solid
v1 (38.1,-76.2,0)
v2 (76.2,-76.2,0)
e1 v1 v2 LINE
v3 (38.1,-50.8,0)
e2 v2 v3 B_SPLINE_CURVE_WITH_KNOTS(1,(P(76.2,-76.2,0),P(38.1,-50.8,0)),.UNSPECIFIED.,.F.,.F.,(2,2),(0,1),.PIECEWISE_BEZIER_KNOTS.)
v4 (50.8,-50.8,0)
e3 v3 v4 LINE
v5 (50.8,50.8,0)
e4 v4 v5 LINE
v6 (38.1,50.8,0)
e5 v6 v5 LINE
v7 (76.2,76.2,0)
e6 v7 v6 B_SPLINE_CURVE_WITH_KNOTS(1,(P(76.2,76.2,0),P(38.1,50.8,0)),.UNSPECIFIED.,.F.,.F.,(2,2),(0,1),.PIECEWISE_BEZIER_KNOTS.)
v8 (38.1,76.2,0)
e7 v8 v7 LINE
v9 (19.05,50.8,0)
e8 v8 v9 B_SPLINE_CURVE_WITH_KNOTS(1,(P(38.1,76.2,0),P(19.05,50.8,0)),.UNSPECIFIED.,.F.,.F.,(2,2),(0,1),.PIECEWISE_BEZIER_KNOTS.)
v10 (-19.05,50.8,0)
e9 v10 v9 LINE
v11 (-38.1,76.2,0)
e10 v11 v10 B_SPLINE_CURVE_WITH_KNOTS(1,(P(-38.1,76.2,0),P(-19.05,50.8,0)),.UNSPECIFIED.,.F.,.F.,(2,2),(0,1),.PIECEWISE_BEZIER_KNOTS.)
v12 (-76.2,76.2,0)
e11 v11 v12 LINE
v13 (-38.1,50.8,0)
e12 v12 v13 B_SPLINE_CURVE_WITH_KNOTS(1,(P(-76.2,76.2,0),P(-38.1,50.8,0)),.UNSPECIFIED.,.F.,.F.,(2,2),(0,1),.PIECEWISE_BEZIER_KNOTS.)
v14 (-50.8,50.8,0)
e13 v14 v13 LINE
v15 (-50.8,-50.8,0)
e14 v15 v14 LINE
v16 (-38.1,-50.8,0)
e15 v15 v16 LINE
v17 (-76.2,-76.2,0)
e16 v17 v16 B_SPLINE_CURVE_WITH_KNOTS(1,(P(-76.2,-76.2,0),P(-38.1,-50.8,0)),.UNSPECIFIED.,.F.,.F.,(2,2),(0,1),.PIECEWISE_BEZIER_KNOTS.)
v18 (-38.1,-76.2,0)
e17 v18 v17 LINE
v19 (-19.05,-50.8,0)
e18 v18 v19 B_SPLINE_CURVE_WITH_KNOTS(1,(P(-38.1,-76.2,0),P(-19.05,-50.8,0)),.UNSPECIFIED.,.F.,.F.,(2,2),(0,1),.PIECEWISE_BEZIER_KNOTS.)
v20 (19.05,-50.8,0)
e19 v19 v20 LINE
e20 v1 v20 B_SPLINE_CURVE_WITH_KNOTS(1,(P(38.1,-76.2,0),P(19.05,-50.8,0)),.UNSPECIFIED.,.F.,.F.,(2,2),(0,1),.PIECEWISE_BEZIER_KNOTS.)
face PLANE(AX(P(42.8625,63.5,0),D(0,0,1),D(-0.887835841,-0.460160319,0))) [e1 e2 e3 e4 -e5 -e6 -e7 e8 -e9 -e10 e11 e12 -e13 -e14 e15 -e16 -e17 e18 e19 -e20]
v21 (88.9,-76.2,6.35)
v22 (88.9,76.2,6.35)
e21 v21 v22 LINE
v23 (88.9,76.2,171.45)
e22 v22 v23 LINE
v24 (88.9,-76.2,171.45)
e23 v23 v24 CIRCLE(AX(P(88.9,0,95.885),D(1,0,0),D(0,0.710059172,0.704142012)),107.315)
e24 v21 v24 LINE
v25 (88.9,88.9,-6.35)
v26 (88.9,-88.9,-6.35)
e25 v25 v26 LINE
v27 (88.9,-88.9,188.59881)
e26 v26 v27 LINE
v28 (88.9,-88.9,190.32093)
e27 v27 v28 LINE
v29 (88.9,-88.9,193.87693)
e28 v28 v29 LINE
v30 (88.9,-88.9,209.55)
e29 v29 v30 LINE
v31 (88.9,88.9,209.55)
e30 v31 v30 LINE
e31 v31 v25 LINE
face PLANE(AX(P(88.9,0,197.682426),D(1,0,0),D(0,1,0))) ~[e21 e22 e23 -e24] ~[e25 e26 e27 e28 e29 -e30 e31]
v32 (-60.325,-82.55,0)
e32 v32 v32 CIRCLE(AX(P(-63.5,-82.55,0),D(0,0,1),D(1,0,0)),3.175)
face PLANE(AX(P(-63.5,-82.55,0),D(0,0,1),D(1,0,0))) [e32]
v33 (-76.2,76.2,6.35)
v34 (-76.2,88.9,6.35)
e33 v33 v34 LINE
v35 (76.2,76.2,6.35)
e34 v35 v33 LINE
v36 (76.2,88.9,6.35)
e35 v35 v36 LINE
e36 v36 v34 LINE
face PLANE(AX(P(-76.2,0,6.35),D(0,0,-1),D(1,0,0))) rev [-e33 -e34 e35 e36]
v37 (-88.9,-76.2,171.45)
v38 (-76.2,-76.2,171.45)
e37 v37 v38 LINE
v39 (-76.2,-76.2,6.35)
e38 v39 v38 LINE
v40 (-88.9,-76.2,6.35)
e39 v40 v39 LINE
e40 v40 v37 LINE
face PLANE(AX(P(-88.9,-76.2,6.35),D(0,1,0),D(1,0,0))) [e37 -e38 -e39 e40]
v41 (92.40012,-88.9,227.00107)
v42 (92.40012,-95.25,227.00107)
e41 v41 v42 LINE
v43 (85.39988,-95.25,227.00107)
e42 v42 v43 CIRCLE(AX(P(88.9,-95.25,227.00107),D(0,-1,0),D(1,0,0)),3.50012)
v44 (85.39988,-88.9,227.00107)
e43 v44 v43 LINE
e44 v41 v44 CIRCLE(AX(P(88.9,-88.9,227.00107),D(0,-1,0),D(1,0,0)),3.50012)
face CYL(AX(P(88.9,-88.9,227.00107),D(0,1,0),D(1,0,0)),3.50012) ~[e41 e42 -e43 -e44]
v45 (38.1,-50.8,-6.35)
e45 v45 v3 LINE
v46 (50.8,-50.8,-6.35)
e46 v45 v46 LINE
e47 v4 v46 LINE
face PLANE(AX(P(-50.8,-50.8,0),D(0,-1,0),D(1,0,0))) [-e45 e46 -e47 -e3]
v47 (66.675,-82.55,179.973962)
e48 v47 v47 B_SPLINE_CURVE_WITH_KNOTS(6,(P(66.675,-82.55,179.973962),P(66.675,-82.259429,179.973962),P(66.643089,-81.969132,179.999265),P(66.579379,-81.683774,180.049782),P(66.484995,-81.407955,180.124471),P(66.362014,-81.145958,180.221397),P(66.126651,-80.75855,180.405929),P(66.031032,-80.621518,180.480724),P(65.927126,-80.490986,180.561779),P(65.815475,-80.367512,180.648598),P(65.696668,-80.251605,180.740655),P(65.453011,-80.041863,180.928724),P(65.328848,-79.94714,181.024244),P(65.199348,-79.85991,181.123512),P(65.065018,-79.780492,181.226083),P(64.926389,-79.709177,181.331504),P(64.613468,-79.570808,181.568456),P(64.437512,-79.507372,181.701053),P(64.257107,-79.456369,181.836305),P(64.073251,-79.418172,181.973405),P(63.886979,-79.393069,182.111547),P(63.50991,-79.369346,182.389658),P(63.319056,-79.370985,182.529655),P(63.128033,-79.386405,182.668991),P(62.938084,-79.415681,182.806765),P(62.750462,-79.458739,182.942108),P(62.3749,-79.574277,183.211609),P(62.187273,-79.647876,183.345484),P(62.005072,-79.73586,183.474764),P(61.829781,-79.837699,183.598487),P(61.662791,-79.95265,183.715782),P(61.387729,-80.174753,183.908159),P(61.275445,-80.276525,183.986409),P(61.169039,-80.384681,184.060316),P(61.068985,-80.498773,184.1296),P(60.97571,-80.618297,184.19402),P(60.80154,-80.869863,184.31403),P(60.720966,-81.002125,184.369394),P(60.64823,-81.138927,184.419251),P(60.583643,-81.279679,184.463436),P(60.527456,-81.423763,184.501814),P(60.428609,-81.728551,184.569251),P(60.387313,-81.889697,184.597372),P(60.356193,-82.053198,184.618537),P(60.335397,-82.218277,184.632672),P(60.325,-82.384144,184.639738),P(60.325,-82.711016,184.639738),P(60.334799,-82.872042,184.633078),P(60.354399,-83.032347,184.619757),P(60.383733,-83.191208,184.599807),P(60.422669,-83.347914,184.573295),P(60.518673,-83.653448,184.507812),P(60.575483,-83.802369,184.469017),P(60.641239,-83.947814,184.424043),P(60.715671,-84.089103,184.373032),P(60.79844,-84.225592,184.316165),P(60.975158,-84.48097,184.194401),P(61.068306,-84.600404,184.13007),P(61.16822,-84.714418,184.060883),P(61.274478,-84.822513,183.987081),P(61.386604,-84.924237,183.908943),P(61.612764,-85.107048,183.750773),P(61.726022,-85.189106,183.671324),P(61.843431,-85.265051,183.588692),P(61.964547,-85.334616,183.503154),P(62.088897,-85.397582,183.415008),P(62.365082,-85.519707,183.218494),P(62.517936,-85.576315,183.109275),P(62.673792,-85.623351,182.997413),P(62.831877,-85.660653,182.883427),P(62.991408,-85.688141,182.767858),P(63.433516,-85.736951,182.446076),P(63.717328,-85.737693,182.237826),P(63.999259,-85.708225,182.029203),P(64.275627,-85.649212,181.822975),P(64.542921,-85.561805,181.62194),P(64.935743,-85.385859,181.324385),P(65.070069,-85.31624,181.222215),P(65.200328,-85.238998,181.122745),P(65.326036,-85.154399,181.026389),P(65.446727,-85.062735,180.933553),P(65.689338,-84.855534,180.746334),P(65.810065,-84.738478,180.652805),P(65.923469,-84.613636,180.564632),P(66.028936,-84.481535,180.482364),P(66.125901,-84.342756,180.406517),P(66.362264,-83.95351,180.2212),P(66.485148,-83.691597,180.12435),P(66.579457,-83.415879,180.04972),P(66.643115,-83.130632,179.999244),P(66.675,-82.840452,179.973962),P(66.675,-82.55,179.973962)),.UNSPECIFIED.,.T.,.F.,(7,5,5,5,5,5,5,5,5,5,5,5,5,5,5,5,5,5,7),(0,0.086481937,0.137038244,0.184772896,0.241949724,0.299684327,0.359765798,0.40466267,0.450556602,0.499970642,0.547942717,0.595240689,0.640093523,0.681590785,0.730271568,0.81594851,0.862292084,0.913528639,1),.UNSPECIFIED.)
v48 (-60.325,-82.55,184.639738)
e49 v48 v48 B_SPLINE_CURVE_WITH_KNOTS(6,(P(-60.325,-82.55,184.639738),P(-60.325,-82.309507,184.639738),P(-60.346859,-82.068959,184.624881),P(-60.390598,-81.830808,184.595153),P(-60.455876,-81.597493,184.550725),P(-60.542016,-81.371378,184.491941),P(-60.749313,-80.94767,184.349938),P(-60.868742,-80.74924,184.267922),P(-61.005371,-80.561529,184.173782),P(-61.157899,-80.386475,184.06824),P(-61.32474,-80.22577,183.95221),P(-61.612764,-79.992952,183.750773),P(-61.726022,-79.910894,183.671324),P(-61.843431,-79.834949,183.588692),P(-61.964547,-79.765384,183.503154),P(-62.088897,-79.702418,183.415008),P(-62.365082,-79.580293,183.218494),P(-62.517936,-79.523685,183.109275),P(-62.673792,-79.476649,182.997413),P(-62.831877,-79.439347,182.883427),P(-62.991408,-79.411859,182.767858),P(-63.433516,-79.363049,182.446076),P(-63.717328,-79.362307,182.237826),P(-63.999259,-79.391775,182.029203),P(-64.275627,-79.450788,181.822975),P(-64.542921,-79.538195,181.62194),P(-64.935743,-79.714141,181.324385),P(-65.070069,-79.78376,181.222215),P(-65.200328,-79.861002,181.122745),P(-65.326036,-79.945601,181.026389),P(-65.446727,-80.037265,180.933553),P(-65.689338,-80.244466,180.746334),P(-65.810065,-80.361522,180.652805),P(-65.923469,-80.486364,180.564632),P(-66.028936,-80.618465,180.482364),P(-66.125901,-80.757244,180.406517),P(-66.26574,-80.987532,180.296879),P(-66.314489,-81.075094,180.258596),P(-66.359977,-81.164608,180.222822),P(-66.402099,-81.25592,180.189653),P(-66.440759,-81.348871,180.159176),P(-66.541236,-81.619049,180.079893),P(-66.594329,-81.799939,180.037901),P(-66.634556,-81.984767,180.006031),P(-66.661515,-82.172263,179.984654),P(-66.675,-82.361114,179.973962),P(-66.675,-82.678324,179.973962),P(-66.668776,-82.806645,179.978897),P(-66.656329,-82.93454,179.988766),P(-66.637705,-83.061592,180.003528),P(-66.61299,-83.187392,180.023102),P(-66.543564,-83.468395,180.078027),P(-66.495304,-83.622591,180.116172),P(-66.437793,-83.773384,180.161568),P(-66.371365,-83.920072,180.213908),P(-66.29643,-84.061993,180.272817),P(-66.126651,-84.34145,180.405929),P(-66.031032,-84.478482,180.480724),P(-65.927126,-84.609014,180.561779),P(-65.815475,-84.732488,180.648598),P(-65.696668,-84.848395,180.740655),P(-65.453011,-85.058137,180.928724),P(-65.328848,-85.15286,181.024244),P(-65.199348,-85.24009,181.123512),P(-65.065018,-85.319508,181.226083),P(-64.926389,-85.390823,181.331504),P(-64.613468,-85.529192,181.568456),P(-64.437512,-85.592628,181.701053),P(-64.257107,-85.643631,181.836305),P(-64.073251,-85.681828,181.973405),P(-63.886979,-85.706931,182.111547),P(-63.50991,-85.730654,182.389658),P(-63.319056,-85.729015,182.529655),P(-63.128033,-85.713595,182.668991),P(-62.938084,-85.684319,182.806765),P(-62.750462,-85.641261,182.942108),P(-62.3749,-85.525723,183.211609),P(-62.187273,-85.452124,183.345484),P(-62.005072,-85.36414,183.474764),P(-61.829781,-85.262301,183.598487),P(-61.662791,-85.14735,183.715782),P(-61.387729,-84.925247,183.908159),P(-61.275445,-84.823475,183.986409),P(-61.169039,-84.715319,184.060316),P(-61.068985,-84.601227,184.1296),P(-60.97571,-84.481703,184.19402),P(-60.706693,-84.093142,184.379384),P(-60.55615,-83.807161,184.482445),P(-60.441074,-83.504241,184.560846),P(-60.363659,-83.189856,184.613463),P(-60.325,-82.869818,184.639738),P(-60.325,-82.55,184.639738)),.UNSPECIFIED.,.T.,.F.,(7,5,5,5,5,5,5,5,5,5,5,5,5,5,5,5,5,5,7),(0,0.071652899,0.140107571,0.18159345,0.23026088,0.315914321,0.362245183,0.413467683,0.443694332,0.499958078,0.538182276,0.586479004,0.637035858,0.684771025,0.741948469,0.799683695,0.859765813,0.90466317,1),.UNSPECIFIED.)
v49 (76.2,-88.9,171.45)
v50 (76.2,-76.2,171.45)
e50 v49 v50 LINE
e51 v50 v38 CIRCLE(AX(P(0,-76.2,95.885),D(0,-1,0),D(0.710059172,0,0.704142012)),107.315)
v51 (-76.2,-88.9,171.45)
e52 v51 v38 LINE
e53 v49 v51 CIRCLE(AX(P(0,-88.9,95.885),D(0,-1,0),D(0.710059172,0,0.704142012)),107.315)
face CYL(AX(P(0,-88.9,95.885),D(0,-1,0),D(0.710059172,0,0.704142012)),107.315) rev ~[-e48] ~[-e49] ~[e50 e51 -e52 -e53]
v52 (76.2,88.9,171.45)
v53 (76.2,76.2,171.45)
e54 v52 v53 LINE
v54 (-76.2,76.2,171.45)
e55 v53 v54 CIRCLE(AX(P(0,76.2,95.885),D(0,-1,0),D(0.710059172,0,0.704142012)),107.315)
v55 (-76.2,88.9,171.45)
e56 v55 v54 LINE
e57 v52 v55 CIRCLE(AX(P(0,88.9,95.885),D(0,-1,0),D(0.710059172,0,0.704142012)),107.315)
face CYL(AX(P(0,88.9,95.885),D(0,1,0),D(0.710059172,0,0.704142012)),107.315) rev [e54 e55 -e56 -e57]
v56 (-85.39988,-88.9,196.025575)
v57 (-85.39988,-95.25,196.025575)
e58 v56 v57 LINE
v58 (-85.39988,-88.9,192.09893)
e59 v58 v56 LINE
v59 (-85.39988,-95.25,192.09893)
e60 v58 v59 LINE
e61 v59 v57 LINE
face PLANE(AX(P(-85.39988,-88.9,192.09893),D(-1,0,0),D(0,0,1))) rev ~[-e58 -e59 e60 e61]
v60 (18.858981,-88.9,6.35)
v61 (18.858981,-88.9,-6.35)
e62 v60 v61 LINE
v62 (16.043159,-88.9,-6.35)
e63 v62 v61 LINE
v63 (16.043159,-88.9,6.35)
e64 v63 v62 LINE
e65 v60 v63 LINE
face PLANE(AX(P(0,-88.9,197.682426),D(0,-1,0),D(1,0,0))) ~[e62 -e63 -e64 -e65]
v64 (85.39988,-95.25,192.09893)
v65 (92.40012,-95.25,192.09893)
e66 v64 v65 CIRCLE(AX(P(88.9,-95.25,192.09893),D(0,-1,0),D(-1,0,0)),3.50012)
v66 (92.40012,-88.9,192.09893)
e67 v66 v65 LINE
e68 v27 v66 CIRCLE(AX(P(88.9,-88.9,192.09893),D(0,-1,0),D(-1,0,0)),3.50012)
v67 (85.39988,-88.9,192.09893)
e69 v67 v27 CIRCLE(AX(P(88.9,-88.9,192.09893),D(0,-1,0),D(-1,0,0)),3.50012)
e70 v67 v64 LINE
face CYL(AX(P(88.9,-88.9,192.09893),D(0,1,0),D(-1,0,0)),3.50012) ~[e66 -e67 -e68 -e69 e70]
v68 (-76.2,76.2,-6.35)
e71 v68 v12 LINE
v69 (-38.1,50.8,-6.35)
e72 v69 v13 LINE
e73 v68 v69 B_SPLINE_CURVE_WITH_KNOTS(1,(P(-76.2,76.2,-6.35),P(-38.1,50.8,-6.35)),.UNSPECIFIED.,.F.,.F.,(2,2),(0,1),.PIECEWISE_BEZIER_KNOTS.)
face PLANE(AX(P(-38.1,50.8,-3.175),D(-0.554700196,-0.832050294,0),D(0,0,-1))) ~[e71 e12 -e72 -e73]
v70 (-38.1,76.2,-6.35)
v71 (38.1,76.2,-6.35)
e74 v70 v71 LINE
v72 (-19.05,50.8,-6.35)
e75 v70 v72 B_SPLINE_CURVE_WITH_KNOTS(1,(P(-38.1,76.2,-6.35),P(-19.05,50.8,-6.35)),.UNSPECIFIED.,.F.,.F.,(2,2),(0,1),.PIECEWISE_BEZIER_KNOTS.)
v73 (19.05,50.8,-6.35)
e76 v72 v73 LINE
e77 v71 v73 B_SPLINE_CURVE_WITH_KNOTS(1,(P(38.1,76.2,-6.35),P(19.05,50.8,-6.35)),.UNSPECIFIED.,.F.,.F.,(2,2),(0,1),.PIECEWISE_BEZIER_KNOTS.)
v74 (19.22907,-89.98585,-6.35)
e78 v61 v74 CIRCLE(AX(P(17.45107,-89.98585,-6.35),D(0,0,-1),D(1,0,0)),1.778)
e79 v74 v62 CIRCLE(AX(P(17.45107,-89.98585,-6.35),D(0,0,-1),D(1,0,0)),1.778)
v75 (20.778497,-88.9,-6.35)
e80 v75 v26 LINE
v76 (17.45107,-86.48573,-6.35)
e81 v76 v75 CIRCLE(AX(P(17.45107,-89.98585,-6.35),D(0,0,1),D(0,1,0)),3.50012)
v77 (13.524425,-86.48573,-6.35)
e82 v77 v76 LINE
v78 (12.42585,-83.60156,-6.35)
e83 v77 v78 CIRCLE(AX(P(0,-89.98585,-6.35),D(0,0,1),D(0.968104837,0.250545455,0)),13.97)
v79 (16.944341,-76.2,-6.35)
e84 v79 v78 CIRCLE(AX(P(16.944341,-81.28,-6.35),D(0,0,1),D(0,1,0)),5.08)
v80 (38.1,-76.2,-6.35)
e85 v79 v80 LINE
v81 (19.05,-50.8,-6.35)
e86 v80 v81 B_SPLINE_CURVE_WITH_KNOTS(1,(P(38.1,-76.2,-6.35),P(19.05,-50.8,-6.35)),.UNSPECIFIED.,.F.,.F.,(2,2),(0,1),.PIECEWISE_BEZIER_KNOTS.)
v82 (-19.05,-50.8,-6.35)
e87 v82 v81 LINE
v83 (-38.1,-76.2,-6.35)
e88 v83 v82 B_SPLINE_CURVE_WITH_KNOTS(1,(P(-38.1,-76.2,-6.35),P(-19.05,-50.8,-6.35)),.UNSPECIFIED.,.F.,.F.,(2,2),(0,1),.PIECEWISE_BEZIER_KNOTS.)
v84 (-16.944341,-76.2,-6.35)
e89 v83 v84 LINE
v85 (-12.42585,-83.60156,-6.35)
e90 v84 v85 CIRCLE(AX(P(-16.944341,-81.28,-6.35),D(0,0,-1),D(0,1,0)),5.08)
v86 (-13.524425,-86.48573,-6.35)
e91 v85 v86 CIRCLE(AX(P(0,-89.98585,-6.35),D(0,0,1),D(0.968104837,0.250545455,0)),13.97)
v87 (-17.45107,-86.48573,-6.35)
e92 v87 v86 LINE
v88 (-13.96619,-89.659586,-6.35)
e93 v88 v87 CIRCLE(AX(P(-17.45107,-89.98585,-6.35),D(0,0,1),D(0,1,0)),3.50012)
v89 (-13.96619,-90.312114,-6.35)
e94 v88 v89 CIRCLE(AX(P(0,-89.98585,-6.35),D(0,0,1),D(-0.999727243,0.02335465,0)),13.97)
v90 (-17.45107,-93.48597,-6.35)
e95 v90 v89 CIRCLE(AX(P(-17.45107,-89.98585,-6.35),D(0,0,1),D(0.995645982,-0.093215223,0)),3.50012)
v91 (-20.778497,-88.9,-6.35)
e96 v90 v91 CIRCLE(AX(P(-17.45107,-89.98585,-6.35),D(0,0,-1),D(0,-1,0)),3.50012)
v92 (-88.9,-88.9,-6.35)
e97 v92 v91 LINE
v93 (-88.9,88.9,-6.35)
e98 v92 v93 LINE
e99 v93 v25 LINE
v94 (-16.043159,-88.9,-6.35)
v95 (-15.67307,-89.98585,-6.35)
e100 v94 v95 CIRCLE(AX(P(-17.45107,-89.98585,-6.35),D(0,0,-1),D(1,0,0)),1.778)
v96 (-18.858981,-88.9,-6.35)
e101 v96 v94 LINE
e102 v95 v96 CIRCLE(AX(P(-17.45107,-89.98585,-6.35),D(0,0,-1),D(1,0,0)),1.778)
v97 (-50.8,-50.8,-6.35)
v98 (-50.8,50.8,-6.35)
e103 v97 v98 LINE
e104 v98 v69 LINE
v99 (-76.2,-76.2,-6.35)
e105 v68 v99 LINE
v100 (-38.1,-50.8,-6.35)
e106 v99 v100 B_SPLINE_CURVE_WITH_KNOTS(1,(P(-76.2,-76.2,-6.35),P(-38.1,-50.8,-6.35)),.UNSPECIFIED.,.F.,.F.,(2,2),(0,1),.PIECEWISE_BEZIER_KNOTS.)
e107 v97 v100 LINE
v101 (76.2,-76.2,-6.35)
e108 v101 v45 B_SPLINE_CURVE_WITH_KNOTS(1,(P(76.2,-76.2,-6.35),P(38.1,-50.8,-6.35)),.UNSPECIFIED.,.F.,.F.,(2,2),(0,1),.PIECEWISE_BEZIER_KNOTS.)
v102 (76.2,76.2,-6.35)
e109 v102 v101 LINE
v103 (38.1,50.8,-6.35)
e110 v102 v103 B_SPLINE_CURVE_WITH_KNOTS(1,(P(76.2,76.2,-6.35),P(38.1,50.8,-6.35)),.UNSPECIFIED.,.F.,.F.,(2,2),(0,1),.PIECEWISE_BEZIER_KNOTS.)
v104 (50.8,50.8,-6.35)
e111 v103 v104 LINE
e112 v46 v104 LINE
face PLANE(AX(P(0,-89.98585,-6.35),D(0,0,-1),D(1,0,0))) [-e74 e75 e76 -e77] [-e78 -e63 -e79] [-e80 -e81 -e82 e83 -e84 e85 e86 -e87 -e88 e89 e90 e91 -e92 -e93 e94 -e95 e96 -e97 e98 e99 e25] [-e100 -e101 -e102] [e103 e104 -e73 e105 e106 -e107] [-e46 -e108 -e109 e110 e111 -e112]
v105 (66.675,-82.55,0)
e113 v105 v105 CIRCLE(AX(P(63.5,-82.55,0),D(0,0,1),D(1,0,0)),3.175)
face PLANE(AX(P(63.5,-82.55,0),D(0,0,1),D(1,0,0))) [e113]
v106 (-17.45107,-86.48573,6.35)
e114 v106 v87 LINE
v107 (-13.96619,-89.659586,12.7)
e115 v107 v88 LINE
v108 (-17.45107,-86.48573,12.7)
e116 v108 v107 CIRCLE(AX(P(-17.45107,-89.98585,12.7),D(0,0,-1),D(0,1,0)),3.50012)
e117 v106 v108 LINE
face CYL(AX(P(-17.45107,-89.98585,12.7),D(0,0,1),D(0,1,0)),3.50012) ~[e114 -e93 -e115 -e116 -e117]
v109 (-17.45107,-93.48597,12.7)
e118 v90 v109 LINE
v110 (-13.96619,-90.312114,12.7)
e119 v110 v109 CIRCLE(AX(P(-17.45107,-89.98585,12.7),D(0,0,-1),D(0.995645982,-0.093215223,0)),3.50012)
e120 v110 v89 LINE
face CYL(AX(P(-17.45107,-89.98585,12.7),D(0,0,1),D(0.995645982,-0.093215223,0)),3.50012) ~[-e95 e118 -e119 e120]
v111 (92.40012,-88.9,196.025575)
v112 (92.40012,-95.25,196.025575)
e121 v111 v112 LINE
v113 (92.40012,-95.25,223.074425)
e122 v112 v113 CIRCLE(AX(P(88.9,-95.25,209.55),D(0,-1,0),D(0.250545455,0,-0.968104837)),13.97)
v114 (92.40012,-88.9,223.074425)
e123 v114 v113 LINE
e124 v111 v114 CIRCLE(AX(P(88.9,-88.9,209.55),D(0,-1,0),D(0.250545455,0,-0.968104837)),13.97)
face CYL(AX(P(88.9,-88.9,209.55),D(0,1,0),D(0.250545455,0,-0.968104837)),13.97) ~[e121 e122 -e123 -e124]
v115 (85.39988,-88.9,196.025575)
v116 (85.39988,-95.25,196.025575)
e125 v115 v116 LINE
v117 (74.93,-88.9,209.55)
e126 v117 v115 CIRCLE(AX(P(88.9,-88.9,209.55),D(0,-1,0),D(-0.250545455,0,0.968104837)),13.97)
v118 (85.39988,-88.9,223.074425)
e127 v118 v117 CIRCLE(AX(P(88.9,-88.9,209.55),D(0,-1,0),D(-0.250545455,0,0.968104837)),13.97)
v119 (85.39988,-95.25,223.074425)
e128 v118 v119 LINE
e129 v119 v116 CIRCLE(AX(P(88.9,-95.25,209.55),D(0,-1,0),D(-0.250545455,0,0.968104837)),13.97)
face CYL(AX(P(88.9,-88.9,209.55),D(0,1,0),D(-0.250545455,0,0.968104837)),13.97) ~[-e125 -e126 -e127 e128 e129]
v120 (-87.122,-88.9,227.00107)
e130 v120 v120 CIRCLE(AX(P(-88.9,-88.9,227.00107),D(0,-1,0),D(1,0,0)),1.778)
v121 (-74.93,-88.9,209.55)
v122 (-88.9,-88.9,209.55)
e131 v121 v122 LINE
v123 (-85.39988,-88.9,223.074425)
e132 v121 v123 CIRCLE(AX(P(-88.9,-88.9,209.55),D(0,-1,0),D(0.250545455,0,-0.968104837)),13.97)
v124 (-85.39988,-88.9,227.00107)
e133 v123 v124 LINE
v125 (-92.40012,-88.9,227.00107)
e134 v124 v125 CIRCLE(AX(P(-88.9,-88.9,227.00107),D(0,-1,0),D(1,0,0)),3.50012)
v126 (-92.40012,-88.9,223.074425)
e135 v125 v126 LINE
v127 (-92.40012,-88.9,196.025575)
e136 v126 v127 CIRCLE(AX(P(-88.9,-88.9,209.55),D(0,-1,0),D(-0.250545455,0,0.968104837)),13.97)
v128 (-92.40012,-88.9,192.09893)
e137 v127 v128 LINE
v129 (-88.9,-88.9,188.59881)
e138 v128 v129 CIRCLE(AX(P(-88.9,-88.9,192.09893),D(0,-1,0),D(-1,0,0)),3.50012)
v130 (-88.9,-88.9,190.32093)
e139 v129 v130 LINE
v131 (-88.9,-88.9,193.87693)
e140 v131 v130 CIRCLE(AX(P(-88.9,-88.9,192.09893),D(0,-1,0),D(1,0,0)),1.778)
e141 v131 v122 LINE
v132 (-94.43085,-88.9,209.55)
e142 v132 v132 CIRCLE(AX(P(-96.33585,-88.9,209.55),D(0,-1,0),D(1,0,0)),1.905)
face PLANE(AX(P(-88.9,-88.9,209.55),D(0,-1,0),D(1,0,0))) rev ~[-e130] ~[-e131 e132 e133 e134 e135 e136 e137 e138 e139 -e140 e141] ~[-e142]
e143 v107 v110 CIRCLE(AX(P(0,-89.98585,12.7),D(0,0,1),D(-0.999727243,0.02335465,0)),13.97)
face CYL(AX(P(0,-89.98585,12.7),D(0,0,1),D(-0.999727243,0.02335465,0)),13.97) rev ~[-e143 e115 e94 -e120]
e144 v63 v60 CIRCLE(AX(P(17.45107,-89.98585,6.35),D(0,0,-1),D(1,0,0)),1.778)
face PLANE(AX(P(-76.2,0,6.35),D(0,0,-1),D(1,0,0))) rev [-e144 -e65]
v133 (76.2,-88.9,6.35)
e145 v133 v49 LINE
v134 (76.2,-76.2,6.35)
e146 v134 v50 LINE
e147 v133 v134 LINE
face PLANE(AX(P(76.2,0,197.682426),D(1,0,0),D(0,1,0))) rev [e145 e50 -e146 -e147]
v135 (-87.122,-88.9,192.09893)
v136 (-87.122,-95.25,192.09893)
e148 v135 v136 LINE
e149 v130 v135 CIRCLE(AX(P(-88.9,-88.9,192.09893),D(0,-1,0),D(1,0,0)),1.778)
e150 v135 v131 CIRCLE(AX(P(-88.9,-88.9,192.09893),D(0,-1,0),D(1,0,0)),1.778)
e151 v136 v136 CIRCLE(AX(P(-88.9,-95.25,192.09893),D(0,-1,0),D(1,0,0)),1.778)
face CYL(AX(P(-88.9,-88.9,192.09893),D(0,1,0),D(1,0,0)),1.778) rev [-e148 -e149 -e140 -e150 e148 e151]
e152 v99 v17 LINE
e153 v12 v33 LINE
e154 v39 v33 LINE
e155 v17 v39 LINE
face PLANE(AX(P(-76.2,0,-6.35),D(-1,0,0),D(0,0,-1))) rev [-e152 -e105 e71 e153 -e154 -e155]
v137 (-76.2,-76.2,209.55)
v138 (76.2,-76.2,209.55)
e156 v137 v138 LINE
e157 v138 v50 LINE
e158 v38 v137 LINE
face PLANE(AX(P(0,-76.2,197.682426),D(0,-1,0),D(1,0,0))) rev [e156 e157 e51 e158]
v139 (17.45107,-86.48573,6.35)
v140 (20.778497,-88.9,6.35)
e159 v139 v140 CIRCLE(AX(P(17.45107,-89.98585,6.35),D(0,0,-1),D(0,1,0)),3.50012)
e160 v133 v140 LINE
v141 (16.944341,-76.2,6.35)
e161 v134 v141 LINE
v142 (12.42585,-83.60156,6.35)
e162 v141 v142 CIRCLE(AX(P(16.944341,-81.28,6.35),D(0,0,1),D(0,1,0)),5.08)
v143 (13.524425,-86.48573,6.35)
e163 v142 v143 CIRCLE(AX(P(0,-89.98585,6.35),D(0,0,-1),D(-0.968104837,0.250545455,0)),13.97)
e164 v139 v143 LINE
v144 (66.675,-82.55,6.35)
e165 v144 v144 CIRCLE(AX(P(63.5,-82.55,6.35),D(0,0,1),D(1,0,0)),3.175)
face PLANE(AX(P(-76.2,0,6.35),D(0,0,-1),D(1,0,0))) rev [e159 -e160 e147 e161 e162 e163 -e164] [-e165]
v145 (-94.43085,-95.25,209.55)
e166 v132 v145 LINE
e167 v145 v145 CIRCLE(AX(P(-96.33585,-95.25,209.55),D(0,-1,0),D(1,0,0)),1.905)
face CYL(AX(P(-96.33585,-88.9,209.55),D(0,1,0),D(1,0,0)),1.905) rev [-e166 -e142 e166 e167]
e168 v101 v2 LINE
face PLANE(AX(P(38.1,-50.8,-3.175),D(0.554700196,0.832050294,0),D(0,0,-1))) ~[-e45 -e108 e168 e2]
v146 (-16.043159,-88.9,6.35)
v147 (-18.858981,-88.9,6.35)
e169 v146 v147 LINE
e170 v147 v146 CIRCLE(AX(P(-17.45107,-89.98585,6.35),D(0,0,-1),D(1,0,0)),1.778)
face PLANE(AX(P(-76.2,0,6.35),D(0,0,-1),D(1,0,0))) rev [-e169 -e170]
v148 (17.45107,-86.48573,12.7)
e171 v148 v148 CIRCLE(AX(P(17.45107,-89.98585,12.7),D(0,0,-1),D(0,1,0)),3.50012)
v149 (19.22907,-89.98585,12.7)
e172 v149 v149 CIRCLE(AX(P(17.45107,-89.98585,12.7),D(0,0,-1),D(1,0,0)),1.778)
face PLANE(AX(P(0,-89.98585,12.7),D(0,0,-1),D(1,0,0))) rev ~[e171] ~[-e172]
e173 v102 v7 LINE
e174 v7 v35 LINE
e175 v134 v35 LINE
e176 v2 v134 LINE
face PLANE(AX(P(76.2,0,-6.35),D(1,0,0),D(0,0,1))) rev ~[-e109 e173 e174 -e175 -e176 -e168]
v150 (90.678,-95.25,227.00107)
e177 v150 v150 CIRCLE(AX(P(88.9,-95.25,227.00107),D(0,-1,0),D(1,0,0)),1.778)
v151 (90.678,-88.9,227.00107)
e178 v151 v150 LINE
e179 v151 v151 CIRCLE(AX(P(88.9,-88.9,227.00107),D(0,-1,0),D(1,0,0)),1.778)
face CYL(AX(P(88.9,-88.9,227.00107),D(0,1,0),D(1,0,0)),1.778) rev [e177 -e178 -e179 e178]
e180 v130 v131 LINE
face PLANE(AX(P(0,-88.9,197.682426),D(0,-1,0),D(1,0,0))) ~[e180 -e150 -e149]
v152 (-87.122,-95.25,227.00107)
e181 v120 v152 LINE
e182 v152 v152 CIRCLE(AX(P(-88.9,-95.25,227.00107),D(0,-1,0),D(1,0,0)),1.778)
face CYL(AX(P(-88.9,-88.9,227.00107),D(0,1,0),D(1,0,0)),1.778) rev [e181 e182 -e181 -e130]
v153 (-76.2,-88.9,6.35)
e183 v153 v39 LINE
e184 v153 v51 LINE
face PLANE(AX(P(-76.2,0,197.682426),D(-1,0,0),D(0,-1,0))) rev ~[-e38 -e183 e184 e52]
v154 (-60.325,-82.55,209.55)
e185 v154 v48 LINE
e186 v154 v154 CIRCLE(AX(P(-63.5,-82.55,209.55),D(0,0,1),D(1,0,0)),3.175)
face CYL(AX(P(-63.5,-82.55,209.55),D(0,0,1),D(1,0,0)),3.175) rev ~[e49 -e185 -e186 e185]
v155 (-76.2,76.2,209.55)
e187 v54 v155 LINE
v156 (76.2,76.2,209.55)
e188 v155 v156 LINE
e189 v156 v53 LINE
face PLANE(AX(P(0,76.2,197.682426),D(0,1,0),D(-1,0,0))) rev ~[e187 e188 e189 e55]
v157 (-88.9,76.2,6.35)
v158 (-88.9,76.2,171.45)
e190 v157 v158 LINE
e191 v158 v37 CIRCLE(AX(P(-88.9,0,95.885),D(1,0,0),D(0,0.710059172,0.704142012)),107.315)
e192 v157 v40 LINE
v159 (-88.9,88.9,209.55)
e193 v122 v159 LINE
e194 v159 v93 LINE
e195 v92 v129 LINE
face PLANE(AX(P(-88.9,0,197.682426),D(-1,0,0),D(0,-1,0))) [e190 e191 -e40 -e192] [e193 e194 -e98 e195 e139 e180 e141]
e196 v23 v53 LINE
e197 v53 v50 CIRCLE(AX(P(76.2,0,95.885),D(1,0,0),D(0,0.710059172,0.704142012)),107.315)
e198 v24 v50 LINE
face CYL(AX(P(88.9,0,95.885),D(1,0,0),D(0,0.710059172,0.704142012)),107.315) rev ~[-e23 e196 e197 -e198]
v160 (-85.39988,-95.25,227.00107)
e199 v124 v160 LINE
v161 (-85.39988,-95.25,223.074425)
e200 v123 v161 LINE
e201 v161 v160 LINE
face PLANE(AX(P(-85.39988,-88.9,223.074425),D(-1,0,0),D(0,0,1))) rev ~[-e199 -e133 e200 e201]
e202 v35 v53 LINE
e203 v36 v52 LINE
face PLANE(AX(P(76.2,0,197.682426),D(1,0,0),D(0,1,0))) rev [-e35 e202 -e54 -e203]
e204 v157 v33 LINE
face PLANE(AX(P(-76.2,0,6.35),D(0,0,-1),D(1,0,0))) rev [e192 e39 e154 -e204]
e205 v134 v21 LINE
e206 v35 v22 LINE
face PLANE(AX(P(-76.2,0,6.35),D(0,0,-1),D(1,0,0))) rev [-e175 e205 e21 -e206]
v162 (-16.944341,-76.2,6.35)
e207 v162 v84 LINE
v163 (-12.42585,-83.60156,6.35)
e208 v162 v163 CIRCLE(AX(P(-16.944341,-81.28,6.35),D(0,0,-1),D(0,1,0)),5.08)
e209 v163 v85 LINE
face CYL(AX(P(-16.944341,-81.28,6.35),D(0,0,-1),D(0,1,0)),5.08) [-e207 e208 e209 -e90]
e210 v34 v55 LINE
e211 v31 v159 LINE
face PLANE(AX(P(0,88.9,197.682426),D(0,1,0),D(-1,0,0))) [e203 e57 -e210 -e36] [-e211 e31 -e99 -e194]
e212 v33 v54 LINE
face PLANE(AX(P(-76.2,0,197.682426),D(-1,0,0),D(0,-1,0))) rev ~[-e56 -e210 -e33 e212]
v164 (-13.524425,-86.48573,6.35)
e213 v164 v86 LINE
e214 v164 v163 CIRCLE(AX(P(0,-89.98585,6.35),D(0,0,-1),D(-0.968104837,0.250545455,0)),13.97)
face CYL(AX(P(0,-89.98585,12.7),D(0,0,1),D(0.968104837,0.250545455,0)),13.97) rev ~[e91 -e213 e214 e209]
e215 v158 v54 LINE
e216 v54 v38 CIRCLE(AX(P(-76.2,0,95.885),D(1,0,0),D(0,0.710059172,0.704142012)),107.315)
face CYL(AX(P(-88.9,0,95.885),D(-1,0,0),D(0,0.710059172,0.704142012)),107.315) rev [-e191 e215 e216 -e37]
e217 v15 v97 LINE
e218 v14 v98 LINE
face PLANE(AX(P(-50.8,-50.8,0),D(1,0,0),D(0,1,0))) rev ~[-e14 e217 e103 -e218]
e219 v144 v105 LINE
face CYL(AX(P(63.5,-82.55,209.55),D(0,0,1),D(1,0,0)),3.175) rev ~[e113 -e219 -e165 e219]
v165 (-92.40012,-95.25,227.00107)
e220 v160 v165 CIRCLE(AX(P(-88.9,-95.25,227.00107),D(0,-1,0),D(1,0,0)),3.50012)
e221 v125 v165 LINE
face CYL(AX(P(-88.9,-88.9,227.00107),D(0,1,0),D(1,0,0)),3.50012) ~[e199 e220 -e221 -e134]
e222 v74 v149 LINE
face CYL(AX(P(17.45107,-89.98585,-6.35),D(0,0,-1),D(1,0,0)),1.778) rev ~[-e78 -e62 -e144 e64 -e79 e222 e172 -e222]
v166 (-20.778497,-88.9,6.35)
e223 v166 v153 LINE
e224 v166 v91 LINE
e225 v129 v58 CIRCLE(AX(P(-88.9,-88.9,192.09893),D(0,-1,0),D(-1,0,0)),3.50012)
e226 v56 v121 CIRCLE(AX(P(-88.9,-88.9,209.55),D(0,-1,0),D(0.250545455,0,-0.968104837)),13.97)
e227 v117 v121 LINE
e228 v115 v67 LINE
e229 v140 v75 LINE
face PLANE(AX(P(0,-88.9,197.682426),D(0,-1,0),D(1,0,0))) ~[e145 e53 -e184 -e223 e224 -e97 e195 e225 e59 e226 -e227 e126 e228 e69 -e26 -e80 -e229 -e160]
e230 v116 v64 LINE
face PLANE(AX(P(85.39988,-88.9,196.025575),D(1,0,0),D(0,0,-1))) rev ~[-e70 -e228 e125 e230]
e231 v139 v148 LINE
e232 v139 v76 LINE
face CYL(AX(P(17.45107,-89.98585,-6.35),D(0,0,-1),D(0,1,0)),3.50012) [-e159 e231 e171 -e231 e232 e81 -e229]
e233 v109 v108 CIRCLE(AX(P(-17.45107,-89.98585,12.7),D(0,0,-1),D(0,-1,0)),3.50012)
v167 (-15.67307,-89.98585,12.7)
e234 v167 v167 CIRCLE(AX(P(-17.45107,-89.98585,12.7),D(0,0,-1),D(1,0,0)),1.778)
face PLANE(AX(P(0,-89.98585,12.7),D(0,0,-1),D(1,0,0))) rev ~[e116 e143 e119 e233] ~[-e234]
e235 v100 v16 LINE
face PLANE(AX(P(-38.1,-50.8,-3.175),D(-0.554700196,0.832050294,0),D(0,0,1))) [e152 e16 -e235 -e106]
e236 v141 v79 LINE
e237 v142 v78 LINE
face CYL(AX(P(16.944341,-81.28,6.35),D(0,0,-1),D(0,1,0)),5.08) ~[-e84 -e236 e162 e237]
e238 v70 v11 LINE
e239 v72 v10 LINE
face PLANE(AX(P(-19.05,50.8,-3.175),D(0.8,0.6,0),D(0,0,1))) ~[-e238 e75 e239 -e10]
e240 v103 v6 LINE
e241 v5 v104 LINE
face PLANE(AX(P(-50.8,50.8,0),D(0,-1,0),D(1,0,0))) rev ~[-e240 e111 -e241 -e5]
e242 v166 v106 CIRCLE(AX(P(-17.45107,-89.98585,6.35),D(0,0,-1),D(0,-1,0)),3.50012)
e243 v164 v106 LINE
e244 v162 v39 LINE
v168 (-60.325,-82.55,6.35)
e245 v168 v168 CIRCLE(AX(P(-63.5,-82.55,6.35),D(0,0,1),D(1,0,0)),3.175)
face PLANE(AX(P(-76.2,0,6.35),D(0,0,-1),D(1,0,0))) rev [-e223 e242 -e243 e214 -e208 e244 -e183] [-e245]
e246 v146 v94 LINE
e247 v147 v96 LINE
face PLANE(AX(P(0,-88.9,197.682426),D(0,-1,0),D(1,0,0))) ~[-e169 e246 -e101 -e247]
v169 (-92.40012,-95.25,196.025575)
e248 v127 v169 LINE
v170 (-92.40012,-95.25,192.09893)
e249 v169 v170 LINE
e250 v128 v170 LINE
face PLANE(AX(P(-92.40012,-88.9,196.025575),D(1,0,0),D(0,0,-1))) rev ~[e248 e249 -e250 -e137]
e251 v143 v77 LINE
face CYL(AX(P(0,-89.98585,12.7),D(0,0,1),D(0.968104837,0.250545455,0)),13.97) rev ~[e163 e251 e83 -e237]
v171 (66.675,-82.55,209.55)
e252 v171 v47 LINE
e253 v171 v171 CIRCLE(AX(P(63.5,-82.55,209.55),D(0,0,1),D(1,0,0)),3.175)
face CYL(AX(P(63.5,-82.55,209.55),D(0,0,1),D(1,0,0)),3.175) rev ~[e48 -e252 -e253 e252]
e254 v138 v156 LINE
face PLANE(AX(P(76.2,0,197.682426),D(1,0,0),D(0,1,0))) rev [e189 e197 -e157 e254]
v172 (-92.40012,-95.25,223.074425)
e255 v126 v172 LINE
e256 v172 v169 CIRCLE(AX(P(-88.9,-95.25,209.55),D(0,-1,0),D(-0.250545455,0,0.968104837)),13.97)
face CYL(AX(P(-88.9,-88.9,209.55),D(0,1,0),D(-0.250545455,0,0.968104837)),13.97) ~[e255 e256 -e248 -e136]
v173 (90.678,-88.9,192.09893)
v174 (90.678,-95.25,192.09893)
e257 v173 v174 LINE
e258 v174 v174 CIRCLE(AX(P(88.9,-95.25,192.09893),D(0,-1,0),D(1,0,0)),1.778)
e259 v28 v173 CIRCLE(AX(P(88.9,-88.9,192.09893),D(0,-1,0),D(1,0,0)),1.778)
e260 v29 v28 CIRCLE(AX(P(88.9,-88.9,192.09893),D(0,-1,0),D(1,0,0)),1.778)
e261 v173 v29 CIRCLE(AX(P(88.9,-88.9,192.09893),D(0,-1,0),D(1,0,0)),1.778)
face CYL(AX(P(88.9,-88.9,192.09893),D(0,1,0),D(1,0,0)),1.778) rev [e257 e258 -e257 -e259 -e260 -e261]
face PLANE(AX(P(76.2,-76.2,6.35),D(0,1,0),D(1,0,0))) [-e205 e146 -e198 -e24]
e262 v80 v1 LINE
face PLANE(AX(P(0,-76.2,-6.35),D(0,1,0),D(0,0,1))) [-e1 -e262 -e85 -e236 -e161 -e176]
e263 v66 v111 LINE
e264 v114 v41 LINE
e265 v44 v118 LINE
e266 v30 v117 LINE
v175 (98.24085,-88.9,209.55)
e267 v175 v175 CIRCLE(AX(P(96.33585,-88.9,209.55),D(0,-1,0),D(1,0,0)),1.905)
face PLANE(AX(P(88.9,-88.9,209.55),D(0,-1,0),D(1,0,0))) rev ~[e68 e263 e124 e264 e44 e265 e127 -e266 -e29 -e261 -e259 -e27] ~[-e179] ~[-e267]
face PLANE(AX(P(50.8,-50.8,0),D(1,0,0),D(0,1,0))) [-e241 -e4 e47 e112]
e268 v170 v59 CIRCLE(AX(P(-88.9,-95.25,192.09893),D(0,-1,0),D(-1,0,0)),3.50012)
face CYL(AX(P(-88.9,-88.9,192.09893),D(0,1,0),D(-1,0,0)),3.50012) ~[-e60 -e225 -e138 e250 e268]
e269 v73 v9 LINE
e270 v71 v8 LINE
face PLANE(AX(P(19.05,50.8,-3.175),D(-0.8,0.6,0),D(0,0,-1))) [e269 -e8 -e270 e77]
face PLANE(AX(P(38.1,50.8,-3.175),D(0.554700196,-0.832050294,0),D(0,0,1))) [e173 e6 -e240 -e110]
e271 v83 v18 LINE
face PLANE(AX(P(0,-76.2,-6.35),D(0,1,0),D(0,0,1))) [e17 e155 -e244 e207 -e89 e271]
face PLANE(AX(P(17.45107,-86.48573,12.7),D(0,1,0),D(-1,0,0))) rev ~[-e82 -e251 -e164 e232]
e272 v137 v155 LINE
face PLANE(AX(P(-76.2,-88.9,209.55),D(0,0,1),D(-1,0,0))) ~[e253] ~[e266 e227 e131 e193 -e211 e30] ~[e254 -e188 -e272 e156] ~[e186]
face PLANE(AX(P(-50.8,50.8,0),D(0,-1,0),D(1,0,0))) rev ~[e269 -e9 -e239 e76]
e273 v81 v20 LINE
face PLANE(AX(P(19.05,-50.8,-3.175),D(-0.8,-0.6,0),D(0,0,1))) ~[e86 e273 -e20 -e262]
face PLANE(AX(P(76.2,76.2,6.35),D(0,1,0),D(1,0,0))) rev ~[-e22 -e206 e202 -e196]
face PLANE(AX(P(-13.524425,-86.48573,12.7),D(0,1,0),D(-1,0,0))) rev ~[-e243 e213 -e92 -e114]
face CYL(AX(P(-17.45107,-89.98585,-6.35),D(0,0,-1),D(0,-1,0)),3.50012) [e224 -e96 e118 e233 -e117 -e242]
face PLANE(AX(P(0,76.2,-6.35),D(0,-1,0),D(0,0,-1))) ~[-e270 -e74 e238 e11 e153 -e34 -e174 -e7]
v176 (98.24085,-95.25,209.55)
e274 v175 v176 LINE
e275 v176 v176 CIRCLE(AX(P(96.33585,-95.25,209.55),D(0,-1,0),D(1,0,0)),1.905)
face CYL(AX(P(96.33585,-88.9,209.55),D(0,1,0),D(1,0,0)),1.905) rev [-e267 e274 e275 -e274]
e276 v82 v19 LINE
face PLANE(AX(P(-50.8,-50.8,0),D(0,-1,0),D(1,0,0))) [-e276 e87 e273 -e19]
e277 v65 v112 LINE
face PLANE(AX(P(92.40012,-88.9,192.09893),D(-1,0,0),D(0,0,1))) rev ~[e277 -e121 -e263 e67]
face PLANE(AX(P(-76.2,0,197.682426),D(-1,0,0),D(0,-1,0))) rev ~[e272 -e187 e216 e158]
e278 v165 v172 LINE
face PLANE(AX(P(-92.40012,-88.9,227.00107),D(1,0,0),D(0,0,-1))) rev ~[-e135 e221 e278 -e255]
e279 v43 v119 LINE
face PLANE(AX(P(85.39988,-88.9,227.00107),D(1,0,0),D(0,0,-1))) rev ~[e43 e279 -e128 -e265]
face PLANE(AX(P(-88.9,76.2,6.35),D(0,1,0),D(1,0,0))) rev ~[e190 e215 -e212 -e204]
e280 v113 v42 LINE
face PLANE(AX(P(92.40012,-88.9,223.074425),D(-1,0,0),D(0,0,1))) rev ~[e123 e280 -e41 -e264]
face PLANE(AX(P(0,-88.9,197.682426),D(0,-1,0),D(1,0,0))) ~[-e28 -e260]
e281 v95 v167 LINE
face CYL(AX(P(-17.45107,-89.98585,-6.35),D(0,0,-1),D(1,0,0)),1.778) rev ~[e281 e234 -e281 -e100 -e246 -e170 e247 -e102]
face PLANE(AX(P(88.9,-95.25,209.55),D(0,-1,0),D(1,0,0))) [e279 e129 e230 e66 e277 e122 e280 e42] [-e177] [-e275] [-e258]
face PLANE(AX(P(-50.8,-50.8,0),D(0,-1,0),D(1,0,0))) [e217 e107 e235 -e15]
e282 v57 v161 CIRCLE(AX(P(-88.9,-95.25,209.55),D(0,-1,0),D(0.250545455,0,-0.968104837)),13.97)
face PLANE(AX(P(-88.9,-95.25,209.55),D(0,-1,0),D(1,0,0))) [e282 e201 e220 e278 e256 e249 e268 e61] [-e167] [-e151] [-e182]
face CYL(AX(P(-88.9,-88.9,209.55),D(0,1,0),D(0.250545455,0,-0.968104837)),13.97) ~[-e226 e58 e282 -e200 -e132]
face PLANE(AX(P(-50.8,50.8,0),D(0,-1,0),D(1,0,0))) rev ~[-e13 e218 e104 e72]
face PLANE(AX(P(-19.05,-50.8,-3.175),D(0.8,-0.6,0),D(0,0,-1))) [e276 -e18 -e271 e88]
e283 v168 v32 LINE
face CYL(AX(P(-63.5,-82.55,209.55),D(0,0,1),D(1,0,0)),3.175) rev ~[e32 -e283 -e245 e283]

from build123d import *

# Parameters (mm, degrees)
F0_W      = 101.6
F0_H      = 101.6
F1_DEPTH  = 6.35
F2_W      = 12.7
F2_H      = 12.7
F3_DEPTH  = 88.9
F5_W      = 12.7
F5_H      = 12.7
F6_DEPTH  = 76.2
F9_W      = 38.1
F9_H      = 6.35
F8_W      = 19.05
F8_H      = 6.35
F14_W     = 12.7
F14_H     = 12.7
F15_DEPTH = 203.2
F17_DEPTH = 12.7
F20_DEPTH = 12.7
F22_R     = 3.175
F23_DEPTH = 209.55
F24_R     = 1.905
F24_R_2   = 1.778
F25_DEPTH = 19.05
F27_DEPTH = 25.4
F28_R     = 5.08
F29_R     = 1.778
F29_R_2   = 1.905
F30_DEPTH = 6.35


# Not quite as in the source:
# - a feature of the source that left no trace in its solid (it failed there, or was rolled back) is left out


with BuildPart() as f1:
    # F0 (on Top) → F1 (new body)
    with BuildSketch(Plane.XY):
        Rectangle(F0_W, F0_H)
    extrude(amount=-F1_DEPTH)



with BuildPart() as f3:
    # F2 (on Right) → F3 (new body, symmetric)
    with BuildSketch(Plane.YZ):
        with Locations((-82.55, 0)):
            Rectangle(F2_W, F2_H)
    extrude(amount=F3_DEPTH, both=True)


with BuildPart() as f4_1:
    # F4: instance of F3
    add(f3.part.mirror(Plane.XZ))


with BuildPart() as f3_1:
    add(f3.part)

    add(f4_1.part)  # F6 merges F4_1
    # F5 (on Front) → F6 (join, symmetric)
    with BuildSketch(Plane.XZ):
        with Locations((82.55, 0)):
            Rectangle(F5_W, F5_H)
    extrude(amount=F6_DEPTH, both=True)


with BuildPart() as f7_1:
    # F7: instance of F3
    add(f3_1.part.mirror(Plane.YZ))


with BuildPart() as f1_1:
    add(f1.part)

    add(f3_1.part)  # F10 merges F3

    add(f7_1.part)  # F10 merges F7_1
    # F9 (on face) → F10 section 0
    with BuildSketch(Plane(origin=(0, -76.2, 0), x_dir=(-1, 0, 0), z_dir=(0, 1, 0))):
        with Locations((57.15, -3.175)):
            Rectangle(F9_W, F9_H)
    # F8 (on face) → F10 section 1
    with BuildSketch(Plane.XZ.offset(50.8)):
        with Locations((-28.575, -3.175)):
            Rectangle(F8_W, F8_H)
    loft()


with BuildPart() as f11_1:
    # F11: instance of F1
    add(f1_1.part.mirror(Plane.YZ))


with BuildPart() as f12_1:
    # F12: instance of F11_1
    add(f11_1.part.mirror(Plane.XZ))


with BuildPart() as f12_2:
    # F12: instance of F1
    add(f1_1.part.mirror(Plane.XZ))


with BuildPart() as f1_2:
    add(f1_1.part)

    # F13: union F12_2, F11_1, F12_1
    add(f12_2.part)
    add(f11_1.part)
    add(f12_1.part)

    # F14 (on face) → F15 (join)
    with BuildSketch(Plane.XY.offset(6.35)):
        with Locations((-82.55, 82.55)):
            Rectangle(F14_W, F14_H)
        with Locations((82.55, 82.55)):
            Rectangle(F14_W, F14_H)
        with Locations((82.55, -82.55)):
            Rectangle(F14_W, F14_H)
        with Locations((-82.55, -82.55)):
            Rectangle(F14_W, F14_H)
    extrude(amount=F15_DEPTH)

    # F16 (on face) → F17 (join)
    with BuildSketch(Plane(origin=(-88.9, 0, 0), x_dir=(0, -1, 0), z_dir=(-1, 0, 0))):
        with BuildLine():
            ThreePointArc((-76.2, 171.45), (0, 203.2), (76.2, 171.45))
            Line((76.2, 171.45), (76.2, 209.55))
            Line((76.2, 209.55), (-76.2, 209.55))
            Line((-76.2, 209.55), (-76.2, 171.45))
        make_face()
    extrude(amount=-F17_DEPTH)

    # F18: F1 across plane


with BuildPart() as f1_3:
    add(f1_2.part)
    add(f1_2.part.mirror(Plane.YZ))

    # F19 (on face) → F20 (join)
    with BuildSketch(Plane(origin=(0, 88.9, 0), x_dir=(-1, 0, 0), z_dir=(0, 1, 0))):
        with BuildLine():
            ThreePointArc((-76.2, 171.45), (0, 203.2), (76.2, 171.45))
            Line((76.2, 171.45), (76.2, 209.55))
            Line((76.2, 209.55), (-76.2, 209.55))
            Line((-76.2, 209.55), (-76.2, 171.45))
        make_face()
    extrude(amount=-F20_DEPTH)

    # F21: F1 across plane


with BuildPart() as f1_4:
    add(f1_3.part)
    add(f1_3.part.mirror(Plane.XZ))

    # F22 (on face) → F23 (cut)
    with BuildSketch(Plane.XY.offset(209.55)):
        with Locations((-63.5, -82.55)):
            Circle(F22_R)
        with Locations((63.5, -82.55)):
            Circle(F22_R)
    extrude(amount=-F23_DEPTH, mode=Mode.SUBTRACT)

    # F24 (on face) → F25 (join)
    with BuildSketch(Plane(origin=(0, 0, -6.35), x_dir=(1, 0, 0), z_dir=(0, 0, -1))):
        with BuildLine():
            Line((17.45107, 93.48597), (13.5244245713, 93.48597))
            ThreePointArc((13.5244245713, 93.48597), (0, 103.95585), (-13.5244245713, 93.48597))
            Line((-13.5244245713, 93.48597), (-17.45107, 93.48597))
            ThreePointArc((-17.45107, 93.48597), (-20.95119, 89.98585), (-17.45107, 86.48573))
            Line((-17.45107, 86.48573), (-13.5244245713, 86.48573))
            ThreePointArc((-13.5244245713, 86.48573), (0, 76.01585), (13.5244245713, 86.48573))
            Line((13.5244245713, 86.48573), (17.45107, 86.48573))
            ThreePointArc((17.45107, 86.48573), (20.95119, 89.98585), (17.45107, 93.48597))
        make_face()
        with Locations((0, 82.55)):
            Circle(F24_R, mode=Mode.SUBTRACT)
        with Locations((-17.45107, 89.98585)):
            Circle(F24_R_2, mode=Mode.SUBTRACT)
        with Locations((17.45107, 89.98585)):
            Circle(F24_R_2, mode=Mode.SUBTRACT)
    extrude(amount=-F25_DEPTH)

    # F26 (on face) → F27 (cut)
    with BuildSketch(Plane.XY.offset(12.7)):
        with BuildLine():
            ThreePointArc((-17.45107, -86.48573), (-15.0942845585, -87.3981092098), (-13.9661895841, -89.6595855349))
            ThreePointArc((-13.9661895841, -89.6595855349), (-13.97, -89.98585), (-13.9661895841, -90.3121144651))
            ThreePointArc((-13.9661895841, -90.3121144651), (-15.0942845585, -92.5735907902), (-17.45107, -93.48597))
            Line((-17.45107, -93.48597), (-13.5244245713, -93.48597))
            ThreePointArc((-13.5244245713, -93.48597), (0, -103.95585), (13.5244245713, -93.48597))
            Line((13.5244245713, -93.48597), (17.45107, -93.48597))
            ThreePointArc((17.45107, -93.48597), (13.95095, -89.98585), (17.45107, -86.48573))
            Line((17.45107, -86.48573), (13.5244245713, -86.48573))
            ThreePointArc((13.5244245713, -86.48573), (0, -76.01585), (-13.5244245713, -86.48573))
            Line((-13.5244245713, -86.48573), (-17.45107, -86.48573))
        make_face()
    extrude(amount=-F27_DEPTH, mode=Mode.SUBTRACT)

    # F28
    f28_edges = [f1_4.edges().sort_by_distance(p)[0] for p in [
        (2.260805, -76.2, 0),
        (-2.260805, -76.2, 0),
    ]]
    fillet(f28_edges, radius=F28_R)

    # F29 (on face) → F30 (join)
    with BuildSketch(Plane.XZ.offset(88.9)):
        with BuildLine():
            Line((-85.39988, 192.09893), (-85.39988, 196.0255754287))
            ThreePointArc((-85.39988, 196.0255754287), (-74.93, 209.55), (-85.39988, 223.0744245713))
            Line((-85.39988, 223.0744245713), (-85.39988, 227.00107))
            ThreePointArc((-85.39988, 227.00107), (-88.9, 230.50119), (-92.40012, 227.00107))
            Line((-92.40012, 227.00107), (-92.40012, 223.0744245713))
            ThreePointArc((-92.40012, 223.0744245713), (-102.87, 209.55), (-92.40012, 196.0255754287))
            Line((-92.40012, 196.0255754287), (-92.40012, 192.09893))
            ThreePointArc((-92.40012, 192.09893), (-88.9, 188.59881), (-85.39988, 192.09893))
        make_face()
        with Locations((-88.9, 192.09893)):
            Circle(F29_R, mode=Mode.SUBTRACT)
        with Locations((-96.33585, 209.55)):
            Circle(F29_R_2, mode=Mode.SUBTRACT)
        with Locations((-88.9, 227.00107)):
            Circle(F29_R, mode=Mode.SUBTRACT)
        with BuildLine():
            Line((85.39988, 227.00107), (85.39988, 223.0744245713))
            ThreePointArc((85.39988, 223.0744245713), (74.93, 209.55), (85.39988, 196.0255754287))
            Line((85.39988, 196.0255754287), (85.39988, 192.09893))
            ThreePointArc((85.39988, 192.09893), (88.9, 188.59881), (92.40012, 192.09893))
            Line((92.40012, 192.09893), (92.40012, 196.0255754287))
            ThreePointArc((92.40012, 196.0255754287), (102.87, 209.55), (92.40012, 223.0744245713))
            Line((92.40012, 223.0744245713), (92.40012, 227.00107))
            ThreePointArc((92.40012, 227.00107), (88.9, 230.50119), (85.39988, 227.00107))
        make_face()
        with Locations((88.9, 192.09893)):
            Circle(F29_R, mode=Mode.SUBTRACT)
        with Locations((96.33585, 209.55)):
            Circle(F29_R_2, mode=Mode.SUBTRACT)
        with Locations((88.9, 227.00107)):
            Circle(F29_R, mode=Mode.SUBTRACT)
    extrude(amount=F30_DEPTH)


solid = f1_4.part
